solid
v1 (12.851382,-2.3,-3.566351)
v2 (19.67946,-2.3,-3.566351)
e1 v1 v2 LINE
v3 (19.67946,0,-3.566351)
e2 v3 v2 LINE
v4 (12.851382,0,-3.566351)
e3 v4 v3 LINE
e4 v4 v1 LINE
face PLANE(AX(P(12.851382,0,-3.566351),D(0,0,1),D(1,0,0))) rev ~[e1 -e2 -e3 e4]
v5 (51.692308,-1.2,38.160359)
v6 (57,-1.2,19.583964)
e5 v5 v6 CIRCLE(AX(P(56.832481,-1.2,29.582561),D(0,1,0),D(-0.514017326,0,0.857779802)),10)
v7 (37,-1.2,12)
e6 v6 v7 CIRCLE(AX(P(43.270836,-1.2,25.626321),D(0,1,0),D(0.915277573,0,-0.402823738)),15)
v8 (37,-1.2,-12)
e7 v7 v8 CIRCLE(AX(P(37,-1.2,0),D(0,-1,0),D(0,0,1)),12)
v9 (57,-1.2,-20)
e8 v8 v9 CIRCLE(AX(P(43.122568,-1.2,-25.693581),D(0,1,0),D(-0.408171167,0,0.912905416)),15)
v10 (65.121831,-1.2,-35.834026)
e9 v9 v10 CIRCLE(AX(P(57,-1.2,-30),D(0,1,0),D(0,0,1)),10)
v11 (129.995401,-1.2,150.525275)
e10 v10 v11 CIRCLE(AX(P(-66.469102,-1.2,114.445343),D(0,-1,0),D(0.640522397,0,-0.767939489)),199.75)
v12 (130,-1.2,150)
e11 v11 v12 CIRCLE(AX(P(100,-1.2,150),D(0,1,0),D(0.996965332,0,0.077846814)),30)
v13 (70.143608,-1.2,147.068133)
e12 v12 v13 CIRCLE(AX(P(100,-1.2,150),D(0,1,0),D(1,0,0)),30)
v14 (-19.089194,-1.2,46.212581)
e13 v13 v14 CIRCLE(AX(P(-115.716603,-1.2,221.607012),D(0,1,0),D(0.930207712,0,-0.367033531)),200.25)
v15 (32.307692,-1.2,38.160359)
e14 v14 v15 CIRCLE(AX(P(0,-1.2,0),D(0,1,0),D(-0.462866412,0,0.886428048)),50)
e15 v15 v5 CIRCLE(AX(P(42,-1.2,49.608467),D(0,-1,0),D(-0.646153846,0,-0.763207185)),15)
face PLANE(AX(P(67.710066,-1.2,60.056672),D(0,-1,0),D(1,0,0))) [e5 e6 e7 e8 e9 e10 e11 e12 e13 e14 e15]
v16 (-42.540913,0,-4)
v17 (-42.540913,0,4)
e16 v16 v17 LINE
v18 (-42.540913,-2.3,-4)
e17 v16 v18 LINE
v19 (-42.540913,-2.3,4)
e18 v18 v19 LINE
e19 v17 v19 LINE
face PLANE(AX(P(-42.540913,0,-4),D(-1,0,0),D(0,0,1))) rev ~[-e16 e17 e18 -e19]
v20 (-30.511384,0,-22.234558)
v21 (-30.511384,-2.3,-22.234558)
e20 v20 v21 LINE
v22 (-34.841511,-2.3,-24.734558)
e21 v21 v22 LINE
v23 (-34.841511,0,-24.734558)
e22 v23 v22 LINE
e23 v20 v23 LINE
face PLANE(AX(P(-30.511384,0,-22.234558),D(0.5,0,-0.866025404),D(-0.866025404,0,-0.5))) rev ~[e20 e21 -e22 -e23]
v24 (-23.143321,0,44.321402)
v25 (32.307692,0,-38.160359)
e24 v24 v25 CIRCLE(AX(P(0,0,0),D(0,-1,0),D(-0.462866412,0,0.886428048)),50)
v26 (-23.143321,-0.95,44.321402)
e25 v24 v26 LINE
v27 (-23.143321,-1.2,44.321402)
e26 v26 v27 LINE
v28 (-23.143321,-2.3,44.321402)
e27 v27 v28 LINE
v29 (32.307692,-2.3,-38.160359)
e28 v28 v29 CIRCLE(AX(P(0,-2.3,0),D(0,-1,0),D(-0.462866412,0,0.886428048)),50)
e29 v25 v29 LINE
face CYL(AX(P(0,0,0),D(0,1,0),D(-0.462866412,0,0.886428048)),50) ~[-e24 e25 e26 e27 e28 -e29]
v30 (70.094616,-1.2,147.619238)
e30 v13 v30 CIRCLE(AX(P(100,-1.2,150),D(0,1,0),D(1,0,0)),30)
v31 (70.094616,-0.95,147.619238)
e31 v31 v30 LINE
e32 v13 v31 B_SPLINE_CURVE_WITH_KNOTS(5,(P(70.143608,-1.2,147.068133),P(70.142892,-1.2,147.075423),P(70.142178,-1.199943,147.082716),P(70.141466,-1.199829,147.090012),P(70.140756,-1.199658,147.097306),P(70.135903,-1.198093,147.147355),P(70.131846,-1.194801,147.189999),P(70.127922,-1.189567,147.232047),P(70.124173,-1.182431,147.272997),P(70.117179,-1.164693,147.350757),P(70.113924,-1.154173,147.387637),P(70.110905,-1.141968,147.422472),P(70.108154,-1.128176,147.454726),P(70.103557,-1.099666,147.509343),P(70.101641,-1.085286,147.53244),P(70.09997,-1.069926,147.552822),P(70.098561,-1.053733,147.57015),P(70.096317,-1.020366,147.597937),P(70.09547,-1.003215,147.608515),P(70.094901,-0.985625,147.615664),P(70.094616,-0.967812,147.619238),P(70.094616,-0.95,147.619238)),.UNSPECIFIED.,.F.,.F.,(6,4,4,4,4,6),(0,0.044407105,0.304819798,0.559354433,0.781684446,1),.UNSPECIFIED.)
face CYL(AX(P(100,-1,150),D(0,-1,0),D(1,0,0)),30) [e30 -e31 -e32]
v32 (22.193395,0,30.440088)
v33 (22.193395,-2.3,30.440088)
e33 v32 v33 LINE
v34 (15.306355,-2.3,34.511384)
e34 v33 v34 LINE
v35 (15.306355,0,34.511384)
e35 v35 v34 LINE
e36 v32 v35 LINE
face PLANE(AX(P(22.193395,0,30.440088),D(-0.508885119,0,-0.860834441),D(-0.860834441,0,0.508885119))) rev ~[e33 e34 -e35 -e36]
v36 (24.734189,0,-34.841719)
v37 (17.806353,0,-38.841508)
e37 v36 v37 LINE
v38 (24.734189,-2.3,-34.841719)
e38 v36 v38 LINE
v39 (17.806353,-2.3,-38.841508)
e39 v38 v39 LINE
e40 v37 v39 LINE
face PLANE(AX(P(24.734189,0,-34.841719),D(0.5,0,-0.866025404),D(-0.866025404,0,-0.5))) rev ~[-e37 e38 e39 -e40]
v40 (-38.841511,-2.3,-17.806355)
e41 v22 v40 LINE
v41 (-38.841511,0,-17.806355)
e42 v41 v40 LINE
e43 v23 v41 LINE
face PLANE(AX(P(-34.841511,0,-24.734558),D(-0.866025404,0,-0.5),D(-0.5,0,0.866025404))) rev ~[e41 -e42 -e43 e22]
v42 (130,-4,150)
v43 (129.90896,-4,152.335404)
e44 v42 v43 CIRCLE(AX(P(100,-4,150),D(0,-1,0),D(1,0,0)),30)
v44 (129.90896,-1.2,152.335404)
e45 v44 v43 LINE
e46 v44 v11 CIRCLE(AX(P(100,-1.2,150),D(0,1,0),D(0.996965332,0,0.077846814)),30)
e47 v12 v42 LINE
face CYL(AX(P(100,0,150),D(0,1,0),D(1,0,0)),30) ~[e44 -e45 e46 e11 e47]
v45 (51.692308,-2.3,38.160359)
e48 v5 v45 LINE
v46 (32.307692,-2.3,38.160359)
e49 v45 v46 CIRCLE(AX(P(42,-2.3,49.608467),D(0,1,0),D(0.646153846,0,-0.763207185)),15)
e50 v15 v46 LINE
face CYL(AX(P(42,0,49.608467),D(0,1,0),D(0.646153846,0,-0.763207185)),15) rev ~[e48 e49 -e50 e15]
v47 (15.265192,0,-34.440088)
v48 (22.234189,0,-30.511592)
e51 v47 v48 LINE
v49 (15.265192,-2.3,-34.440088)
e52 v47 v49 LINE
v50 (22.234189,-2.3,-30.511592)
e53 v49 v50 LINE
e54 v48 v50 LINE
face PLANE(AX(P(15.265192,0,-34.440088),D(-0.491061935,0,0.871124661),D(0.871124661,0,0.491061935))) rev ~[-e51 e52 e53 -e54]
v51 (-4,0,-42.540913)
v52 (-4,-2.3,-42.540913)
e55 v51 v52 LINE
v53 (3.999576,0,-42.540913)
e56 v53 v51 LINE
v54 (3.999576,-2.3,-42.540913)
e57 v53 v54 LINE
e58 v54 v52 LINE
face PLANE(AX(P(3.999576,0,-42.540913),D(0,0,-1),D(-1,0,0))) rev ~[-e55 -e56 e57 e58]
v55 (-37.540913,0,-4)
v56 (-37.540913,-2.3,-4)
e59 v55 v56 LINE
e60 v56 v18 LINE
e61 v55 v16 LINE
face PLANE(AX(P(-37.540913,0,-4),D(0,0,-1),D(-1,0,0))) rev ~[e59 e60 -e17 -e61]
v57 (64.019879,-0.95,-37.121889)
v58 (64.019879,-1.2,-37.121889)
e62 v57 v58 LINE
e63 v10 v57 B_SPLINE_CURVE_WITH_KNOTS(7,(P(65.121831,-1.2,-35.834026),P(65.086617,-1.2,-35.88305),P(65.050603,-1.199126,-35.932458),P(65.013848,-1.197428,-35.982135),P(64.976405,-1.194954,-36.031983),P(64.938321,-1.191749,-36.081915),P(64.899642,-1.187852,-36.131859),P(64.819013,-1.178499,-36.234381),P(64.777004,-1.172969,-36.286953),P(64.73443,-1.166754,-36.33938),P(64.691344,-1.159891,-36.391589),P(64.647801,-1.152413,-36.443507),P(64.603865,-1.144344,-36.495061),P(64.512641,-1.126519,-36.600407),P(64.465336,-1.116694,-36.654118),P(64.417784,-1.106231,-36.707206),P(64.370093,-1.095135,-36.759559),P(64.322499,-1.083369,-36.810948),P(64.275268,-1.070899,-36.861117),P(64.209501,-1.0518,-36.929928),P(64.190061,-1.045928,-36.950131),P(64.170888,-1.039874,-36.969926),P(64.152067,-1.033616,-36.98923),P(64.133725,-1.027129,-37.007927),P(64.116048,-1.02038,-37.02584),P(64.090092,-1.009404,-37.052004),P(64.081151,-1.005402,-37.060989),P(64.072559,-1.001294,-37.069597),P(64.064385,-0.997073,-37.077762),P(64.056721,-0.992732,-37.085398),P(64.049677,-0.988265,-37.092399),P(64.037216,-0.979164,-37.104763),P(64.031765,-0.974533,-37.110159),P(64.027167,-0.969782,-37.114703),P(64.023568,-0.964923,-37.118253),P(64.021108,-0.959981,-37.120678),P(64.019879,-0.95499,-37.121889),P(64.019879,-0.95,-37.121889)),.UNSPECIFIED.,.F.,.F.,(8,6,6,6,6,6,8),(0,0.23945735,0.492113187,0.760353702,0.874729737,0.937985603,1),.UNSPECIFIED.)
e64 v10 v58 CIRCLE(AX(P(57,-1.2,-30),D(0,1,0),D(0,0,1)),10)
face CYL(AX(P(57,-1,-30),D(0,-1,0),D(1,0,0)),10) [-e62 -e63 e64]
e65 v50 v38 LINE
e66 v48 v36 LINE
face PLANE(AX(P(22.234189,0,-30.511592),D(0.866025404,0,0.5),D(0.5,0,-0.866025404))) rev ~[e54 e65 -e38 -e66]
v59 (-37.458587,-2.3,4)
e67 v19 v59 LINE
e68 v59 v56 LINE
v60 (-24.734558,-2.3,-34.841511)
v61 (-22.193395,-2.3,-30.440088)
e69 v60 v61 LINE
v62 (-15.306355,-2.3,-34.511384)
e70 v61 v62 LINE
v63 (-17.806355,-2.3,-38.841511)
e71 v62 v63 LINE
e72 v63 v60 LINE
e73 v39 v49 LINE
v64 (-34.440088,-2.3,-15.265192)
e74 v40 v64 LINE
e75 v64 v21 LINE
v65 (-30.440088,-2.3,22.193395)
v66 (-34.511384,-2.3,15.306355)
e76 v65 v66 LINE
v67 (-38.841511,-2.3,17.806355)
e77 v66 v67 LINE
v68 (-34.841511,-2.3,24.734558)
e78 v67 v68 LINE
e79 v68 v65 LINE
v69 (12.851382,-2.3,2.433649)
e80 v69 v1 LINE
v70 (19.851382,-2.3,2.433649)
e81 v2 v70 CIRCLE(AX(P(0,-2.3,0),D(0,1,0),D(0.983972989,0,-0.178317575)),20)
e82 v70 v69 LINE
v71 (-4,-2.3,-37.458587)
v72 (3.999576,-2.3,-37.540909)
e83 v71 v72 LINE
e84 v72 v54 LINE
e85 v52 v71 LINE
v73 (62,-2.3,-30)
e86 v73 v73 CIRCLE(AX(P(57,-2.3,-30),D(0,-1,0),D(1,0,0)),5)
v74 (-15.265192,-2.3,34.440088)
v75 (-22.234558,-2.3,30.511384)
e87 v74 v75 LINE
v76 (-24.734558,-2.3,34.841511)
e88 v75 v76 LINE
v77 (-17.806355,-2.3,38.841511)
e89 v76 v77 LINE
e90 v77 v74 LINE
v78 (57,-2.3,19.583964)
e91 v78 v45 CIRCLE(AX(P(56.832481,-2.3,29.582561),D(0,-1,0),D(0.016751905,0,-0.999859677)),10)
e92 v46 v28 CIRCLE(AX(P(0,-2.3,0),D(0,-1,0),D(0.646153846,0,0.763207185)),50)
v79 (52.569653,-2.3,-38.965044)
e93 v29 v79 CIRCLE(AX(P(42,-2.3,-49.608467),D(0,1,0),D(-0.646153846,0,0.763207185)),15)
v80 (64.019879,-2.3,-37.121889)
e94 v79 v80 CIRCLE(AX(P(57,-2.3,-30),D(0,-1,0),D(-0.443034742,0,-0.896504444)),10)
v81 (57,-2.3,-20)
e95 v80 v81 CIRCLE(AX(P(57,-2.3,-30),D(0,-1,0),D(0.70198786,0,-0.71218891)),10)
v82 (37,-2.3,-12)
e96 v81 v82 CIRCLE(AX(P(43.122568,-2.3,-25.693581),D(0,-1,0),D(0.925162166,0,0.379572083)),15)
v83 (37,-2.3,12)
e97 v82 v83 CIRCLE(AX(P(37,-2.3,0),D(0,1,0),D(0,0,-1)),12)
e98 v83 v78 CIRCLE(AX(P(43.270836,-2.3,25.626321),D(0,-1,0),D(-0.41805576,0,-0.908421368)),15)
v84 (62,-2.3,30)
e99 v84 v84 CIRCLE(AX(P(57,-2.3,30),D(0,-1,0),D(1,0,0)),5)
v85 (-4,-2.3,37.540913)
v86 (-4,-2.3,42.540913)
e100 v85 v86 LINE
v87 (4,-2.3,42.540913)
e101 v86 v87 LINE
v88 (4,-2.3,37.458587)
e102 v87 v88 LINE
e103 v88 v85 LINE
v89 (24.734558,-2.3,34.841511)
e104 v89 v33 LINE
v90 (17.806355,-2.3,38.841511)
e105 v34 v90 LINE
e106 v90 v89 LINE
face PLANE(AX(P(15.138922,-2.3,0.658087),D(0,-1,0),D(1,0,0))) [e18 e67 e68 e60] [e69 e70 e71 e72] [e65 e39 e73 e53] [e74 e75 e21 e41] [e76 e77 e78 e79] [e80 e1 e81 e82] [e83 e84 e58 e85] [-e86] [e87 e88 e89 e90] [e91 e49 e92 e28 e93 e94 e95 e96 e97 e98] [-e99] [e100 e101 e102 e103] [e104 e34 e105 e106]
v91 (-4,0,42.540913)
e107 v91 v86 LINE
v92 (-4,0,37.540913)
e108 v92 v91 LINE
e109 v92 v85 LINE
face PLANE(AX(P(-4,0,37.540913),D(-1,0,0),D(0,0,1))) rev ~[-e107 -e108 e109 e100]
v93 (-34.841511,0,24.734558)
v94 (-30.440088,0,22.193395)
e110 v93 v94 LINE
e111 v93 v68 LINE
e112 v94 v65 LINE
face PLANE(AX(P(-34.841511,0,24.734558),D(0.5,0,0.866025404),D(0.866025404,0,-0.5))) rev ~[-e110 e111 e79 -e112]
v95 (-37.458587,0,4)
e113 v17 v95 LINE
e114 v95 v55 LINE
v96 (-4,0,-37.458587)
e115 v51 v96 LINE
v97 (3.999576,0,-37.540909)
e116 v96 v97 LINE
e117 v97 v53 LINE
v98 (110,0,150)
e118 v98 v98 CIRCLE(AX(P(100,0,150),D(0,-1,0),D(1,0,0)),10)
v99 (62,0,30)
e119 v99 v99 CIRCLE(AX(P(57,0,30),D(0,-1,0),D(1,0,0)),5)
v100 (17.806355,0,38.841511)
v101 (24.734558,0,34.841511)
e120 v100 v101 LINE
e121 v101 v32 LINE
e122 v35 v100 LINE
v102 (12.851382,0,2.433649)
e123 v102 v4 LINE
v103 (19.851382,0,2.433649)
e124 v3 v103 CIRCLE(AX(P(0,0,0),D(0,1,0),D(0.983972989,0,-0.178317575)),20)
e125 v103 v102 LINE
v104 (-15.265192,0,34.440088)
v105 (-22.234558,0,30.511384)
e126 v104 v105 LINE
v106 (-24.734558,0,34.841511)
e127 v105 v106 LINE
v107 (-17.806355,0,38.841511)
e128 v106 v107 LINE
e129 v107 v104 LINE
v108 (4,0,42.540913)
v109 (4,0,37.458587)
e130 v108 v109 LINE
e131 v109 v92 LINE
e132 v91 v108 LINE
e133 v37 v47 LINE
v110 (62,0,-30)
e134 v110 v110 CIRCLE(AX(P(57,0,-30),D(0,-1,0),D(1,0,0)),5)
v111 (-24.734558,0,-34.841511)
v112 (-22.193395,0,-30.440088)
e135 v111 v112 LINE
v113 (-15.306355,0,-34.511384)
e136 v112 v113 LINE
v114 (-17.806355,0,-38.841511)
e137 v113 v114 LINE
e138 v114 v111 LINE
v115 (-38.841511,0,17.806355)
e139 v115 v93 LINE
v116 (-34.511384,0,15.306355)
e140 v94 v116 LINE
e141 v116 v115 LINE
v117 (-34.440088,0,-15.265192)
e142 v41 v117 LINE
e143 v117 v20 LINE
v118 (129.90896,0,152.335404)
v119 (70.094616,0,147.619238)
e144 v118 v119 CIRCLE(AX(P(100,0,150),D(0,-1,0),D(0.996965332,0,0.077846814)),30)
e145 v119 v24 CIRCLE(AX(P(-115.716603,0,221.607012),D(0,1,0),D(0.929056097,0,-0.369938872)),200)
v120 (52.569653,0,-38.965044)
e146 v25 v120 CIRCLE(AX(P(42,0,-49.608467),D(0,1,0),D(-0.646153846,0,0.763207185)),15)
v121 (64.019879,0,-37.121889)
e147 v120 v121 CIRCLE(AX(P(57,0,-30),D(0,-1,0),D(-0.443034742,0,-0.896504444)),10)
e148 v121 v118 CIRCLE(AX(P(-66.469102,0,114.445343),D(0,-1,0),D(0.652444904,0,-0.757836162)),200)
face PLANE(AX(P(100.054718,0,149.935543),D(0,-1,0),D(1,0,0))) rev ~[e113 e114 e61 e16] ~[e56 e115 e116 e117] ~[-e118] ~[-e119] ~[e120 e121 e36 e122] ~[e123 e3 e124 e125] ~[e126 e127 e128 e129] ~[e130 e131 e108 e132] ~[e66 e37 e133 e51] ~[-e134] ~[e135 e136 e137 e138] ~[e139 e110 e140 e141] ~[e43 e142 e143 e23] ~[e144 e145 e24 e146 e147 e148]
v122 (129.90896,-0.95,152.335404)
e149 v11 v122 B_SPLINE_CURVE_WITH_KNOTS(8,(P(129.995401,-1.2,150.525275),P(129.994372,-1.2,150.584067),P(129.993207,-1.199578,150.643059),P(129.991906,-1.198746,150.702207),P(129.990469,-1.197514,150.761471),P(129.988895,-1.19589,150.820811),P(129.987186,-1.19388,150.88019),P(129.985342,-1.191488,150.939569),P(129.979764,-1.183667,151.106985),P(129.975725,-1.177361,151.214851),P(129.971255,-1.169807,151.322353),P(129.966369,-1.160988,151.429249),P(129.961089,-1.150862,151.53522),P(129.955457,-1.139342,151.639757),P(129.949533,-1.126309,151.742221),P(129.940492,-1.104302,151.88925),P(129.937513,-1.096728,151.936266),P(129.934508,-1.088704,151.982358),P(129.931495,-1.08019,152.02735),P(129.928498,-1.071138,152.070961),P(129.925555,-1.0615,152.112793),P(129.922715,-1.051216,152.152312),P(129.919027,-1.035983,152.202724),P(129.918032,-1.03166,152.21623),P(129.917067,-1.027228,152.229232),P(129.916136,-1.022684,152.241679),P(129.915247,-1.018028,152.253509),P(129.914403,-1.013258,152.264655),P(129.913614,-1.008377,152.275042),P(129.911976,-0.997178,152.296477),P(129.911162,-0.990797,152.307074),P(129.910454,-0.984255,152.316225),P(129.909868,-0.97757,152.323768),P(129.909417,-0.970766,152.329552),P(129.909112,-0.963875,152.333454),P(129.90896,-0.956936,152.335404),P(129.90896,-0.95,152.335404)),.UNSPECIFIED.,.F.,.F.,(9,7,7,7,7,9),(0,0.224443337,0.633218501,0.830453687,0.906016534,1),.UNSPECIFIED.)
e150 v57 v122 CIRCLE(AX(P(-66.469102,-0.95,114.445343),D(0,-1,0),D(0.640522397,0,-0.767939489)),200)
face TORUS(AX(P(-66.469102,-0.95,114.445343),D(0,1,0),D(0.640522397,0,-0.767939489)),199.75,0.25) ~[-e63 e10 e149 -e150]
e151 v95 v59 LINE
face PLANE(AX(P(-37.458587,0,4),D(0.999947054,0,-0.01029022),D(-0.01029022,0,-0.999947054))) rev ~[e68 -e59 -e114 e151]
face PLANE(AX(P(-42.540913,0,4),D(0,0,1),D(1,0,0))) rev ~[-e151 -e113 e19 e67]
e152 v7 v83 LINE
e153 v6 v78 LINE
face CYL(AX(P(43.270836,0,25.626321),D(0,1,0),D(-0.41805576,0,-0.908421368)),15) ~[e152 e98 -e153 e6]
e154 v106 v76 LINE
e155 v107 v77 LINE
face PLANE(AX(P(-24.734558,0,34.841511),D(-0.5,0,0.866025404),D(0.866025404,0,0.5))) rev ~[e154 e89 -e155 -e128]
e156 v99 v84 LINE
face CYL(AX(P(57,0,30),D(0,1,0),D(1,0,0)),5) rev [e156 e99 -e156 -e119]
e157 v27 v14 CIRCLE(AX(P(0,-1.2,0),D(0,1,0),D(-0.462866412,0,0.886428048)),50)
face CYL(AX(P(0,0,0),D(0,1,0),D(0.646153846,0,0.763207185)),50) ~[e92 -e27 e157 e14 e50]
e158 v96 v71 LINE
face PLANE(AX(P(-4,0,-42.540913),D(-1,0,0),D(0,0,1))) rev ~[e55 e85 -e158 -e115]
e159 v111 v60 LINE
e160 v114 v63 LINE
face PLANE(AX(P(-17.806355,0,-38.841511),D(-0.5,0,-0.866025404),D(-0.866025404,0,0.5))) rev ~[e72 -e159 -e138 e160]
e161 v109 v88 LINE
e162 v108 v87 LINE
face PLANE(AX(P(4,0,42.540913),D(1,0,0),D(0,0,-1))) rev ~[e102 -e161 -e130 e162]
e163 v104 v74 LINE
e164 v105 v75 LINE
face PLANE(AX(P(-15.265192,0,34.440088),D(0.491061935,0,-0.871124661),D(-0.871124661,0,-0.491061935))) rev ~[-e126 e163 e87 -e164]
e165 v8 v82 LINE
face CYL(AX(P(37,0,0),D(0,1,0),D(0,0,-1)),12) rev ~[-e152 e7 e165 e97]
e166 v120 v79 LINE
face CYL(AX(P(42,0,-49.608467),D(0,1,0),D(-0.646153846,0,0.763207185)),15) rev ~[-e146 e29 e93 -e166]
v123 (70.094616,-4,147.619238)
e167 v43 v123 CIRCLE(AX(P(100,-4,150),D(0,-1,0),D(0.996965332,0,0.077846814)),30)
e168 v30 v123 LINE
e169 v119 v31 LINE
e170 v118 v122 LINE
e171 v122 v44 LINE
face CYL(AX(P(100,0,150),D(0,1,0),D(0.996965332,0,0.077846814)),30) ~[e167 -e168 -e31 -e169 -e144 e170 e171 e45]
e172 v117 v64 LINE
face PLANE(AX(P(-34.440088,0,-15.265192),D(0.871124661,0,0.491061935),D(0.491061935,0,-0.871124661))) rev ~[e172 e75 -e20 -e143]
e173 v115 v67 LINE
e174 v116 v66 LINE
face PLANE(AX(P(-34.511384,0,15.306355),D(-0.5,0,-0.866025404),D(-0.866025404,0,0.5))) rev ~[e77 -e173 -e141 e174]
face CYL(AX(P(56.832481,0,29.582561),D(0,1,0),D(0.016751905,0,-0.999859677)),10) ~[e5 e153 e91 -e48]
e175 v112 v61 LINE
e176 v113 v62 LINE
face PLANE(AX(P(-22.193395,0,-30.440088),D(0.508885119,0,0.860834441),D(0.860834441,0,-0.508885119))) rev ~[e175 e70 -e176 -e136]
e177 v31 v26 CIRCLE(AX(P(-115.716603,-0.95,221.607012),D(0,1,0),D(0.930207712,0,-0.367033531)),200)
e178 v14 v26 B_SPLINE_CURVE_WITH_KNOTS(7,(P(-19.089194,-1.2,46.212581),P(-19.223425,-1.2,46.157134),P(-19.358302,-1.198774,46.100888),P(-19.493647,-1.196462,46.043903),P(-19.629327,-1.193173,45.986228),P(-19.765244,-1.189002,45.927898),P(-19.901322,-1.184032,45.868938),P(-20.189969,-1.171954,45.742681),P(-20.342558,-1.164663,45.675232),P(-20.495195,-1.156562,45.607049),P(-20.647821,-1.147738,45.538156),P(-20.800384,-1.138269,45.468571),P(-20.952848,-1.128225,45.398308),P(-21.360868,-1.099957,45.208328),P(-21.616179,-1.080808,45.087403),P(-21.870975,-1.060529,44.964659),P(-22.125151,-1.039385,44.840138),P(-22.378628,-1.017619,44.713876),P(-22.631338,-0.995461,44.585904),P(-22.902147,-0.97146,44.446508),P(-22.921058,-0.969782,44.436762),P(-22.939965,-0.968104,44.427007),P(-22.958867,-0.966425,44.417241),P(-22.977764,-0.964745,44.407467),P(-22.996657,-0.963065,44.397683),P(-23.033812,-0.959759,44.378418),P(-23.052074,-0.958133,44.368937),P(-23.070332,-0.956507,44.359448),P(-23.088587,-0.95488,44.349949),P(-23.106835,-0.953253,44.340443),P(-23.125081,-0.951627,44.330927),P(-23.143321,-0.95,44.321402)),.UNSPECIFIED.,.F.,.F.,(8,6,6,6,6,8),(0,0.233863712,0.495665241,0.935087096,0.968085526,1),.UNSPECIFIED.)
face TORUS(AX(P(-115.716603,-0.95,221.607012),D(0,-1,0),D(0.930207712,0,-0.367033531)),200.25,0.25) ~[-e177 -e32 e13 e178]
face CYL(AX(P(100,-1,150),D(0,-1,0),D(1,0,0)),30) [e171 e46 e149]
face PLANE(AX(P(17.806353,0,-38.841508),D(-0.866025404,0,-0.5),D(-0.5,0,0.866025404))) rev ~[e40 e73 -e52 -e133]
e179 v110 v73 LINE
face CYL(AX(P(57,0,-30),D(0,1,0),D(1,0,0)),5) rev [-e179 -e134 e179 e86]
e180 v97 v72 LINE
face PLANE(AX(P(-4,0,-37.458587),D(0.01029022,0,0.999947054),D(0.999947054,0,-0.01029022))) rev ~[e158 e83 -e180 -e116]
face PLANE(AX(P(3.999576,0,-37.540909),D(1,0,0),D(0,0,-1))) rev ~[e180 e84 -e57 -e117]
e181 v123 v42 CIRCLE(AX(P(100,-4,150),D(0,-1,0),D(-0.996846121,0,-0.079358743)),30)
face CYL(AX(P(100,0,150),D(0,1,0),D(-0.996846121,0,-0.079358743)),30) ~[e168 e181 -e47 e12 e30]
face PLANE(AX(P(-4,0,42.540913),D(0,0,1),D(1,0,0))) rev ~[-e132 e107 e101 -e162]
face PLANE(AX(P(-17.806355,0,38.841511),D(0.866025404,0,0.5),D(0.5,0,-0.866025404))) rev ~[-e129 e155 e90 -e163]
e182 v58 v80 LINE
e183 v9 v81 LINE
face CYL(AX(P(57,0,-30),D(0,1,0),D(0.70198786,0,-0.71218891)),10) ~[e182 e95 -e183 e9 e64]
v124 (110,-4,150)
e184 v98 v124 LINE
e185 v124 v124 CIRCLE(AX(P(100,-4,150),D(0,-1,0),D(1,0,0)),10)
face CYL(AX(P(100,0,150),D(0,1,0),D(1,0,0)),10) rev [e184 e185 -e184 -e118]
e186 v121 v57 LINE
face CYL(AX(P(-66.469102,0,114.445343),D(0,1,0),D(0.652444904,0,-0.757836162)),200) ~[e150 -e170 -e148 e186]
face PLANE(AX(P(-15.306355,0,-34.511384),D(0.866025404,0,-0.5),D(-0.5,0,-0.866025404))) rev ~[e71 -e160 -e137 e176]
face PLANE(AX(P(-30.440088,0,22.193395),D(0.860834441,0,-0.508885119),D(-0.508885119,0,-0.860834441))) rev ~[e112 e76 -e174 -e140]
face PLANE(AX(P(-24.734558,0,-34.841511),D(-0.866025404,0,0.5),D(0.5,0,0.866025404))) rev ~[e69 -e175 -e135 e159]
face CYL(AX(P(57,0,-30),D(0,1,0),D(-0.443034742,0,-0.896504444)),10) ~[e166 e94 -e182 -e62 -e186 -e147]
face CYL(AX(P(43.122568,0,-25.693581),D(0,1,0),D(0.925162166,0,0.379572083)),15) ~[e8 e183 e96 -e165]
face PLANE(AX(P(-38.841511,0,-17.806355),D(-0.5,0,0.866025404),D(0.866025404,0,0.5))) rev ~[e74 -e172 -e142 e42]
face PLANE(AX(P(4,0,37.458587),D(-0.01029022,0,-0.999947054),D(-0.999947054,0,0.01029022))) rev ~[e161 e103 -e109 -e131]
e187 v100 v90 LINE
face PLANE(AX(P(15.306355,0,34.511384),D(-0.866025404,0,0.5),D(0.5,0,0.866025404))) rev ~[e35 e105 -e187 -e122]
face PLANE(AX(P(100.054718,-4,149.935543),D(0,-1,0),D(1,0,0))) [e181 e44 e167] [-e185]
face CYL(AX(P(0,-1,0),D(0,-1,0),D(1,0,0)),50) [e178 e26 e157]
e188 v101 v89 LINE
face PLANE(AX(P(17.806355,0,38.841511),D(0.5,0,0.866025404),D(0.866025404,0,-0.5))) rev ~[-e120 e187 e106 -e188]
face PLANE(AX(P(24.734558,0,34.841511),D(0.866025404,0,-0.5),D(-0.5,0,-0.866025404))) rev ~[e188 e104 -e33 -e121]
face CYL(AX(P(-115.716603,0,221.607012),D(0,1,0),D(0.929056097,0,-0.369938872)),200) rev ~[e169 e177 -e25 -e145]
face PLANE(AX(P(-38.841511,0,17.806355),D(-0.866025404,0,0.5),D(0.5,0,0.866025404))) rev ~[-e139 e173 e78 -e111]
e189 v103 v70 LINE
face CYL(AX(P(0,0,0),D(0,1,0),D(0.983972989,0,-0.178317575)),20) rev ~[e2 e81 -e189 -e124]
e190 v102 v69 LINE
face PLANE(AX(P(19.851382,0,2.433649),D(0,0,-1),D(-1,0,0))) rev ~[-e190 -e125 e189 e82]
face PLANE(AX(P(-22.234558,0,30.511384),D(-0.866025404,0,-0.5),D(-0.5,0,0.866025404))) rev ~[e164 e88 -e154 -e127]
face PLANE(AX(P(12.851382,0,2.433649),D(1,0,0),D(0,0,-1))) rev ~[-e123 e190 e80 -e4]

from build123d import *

# Parameters (mm, degrees)
F0_R        = 5
F1_DEPTH    = 2.3
F2_DEPTH    = 1.2
F0_R_2      = 10
F3_DEPTH    = 4
F4_T4_ANGLE = 61.2690035525
F4_S5_R     = 30
F4_T6_DEPTH = 114
F4_S7_R     = 10
F4_T8_DEPTH = 114
F5_T4_ANGLE = 41.074053593
F5_S5_R     = 30
F5_T6_DEPTH = 82
F5_S7_R     = 50
F5_T8_DEPTH = 82


# Not quite as in the source:
# - a fillet or chamfer that OpenCascade refuses, or shapes differently, is made with other operations: its cross-section is extruded or revolved along the edge and cut away or added


with BuildPart() as f1:
    # F0 (on Front) → F1 (new body)
    with BuildSketch(Plane.XZ):
        with BuildLine():
            ThreePointArc((51.6923076923, 38.1603592456), (42, 34.6084670192), (32.3076923077, 38.1603592456))
            ThreePointArc((32.3076923077, 38.1603592456), (5.5214165196, 49.6942044872), (-23.1433206058, 44.3214024072))
            ThreePointArc((-23.1433206058, 44.3214024072), (-41.4946584334, -27.8961166023), (32.3076923077, -38.1603592456))
            ThreePointArc((32.3076923077, -38.1603592456), (42.5952420348, -34.6202821085), (52.5696525848, -38.9650444383))
            ThreePointArc((52.5696525848, -38.9650444383), (58.5892524469, -39.8729061912), (64.0198786028, -37.1218891035))
            ThreePointArc((64.0198786028, -37.1218891035), (66.2525372476, -26.2065115681), (57, -20))
            ThreePointArc((57, -20), (48.6934276496, -11.7664308759), (37, -12))
            ThreePointArc((37, -12), (25, 0), (37, 12))
            ThreePointArc((37, 12), (48.5892751146, 11.6008362262), (57, 19.5839644541))
            ThreePointArc((57, 19.5839644541), (66.4476997873, 32.3298447331), (51.6923076923, 38.1603592456))
        make_face()
        Polygon((-15.306354845, -34.5113842702), (-17.806354845, -38.8415112891), (-24.7345580753, -34.8415112891), (-22.1933950155, -30.4400877594), align=None, mode=Mode.SUBTRACT)
        Polygon((-30.5113842702, -22.2345580753), (-34.8415112891, -24.7345580753), (-38.8415112891, -17.806354845), (-34.4400877594, -15.2651917853), align=None, mode=Mode.SUBTRACT)
        Polygon((-37.5409129203, -4), (-42.5409129203, -4), (-42.5409129203, 4), (-37.4585868008, 4), align=None, mode=Mode.SUBTRACT)
        Polygon((3.9995764343, -37.5409085614), (3.9995764343, -42.5409129203), (-4, -42.5409129203), (-4, -37.4585868008), align=None, mode=Mode.SUBTRACT)
        Polygon((22.2341890772, -30.5115922782), (24.7341890772, -34.8417192971), (17.8063526656, -38.8415075143), (15.2651917853, -34.4400877594), align=None, mode=Mode.SUBTRACT)
        with BuildLine():
            Line((19.8513816884, 2.433648508), (12.8513816884, 2.433648508))
            Line((12.8513816884, 2.433648508), (12.8513816884, -3.566351492))
            Line((12.8513816884, -3.566351492), (19.679459775, -3.566351492))
            ThreePointArc((19.679459775, -3.566351492), (-19.9917947344, 0.572837934), (19.8513816884, 2.433648508))
        make_face(mode=Mode.SUBTRACT)
        Polygon((-34.5113842702, 15.306354845), (-38.8415112891, 17.806354845), (-34.8415112891, 24.7345580753), (-30.4400877594, 22.1933950155), align=None, mode=Mode.SUBTRACT)
        Polygon((-22.2345580753, 30.5113842702), (-24.7345580753, 34.8415112891), (-17.806354845, 38.8415112891), (-15.2651917853, 34.4400877594), align=None, mode=Mode.SUBTRACT)
        Polygon((15.306354845, 34.5113842702), (17.806354845, 38.8415112891), (24.7345580753, 34.8415112891), (22.1933950155, 30.4400877594), align=None, mode=Mode.SUBTRACT)
        Polygon((-4, 37.5409129203), (-4, 42.5409129203), (4, 42.5409129203), (4, 37.4585868008), align=None, mode=Mode.SUBTRACT)
        with Locations((57, -30)):
            Circle(F0_R, mode=Mode.SUBTRACT)
        with Locations((57, 30)):
            Circle(F0_R, mode=Mode.SUBTRACT)
    extrude(amount=F1_DEPTH)

    # F0 (on Front) → F2 (join)
    with BuildSketch(Plane.XZ):
        with BuildLine():
            ThreePointArc((-23.1433206058, 44.3214024072), (5.5214165196, 49.6942044872), (32.3076923077, 38.1603592456))
            ThreePointArc((32.3076923077, 38.1603592456), (42, 34.6084670192), (51.6923076923, 38.1603592456))
            ThreePointArc((51.6923076923, 38.1603592456), (66.4476997873, 32.3298447331), (57, 19.5839644541))
            ThreePointArc((57, 19.5839644541), (48.5892751146, 11.6008362262), (37, 12))
            ThreePointArc((37, 12), (25, 0), (37, -12))
            ThreePointArc((37, -12), (48.6934276496, -11.7664308759), (57, -20))
            ThreePointArc((57, -20), (66.2525372476, -26.2065115681), (64.0198786028, -37.1218891035))
            ThreePointArc((64.0198786028, -37.1218891035), (122.4330747785, 48.7493192224), (129.9089599648, 152.3354044245))
            ThreePointArc((129.9089599648, 152.3354044245), (129.977231351, 151.1685891188), (130, 150))
            ThreePointArc((130, 150), (101.1913208393, 120.0236634217), (70.0946163561, 147.6192377033))
            ThreePointArc((70.0946163561, 147.6192377033), (32.7491957463, 87.5998980678), (-23.1433206058, 44.3214024072))
        make_face()
    extrude(amount=F2_DEPTH)

    # F0 (on Front) → F3 (join)
    with BuildSketch(Plane.XZ):
        with BuildLine():
            ThreePointArc((129.9089599648, 152.3354044245), (97.6419159614, 179.9071804032), (70.0946163561, 147.6192377033))
            ThreePointArc((70.0946163561, 147.6192377033), (101.1913208393, 120.0236634217), (130, 150))
            ThreePointArc((130, 150), (129.977231351, 151.1685891188), (129.9089599648, 152.3354044245))
        make_face()
        with Locations((100, 150)):
            Circle(F0_R_2, mode=Mode.SUBTRACT)
    extrude(amount=F3_DEPTH)

    # F4: fillet of radius 0.25 on 1 edges, made by hand


with BuildPart() as f4_tool2:
    # F4_s3 → F4_t4 (revolve)
    with BuildSketch(Plane(origin=(17.0947609574, 0, 14.2583854823), x_dir=(0, 1, 0), z_dir=(-0.7679394892, 0, -0.6405223969))):
        with BuildLine():
            ThreePointArc((-1.2, 69.2879529885), (-1.1267766953, 69.4647296838), (-0.95, 69.5379529885))
            Line((-0.95, 69.5379529885), (-1.2, 69.5379529885))
            Line((-1.2, 69.5379529885), (-1.2, 69.2879529885))
        make_face()
    revolve(axis=Axis((-66.469102104, -1.2, 114.4453432197), (0, -1, 0)), revolution_arc=F4_T4_ANGLE)

    # F4_s5 → F4_t6 (cut, symmetric)
    with BuildSketch(Plane.XZ.offset(1)):
        with Locations((100, 150)):
            Circle(F4_S5_R)
    extrude(amount=F4_T6_DEPTH, both=True, mode=Mode.SUBTRACT)

    # F4_s7 → F4_t8 (cut, symmetric)
    with BuildSketch(Plane.XZ.offset(1)):
        with Locations((57, -30)):
            Circle(F4_S7_R)
    extrude(amount=F4_T8_DEPTH, both=True, mode=Mode.SUBTRACT)


with BuildPart() as f1_1:
    add(f1.part)

    # F4_t1: cut F4_tool2
    add(f4_tool2.part, mode=Mode.SUBTRACT)

    # F5: fillet of radius 0.25 on 1 edges, made by hand


with BuildPart() as f5_tool2:
    # F5_s3 → F5_t4 (revolve)
    with BuildSketch(Plane(origin=(60.0718928504, 0, 152.245866678), x_dir=(0, 1, 0), z_dir=(0.3670335308, 0, 0.9302077119))):
        with BuildLine():
            ThreePointArc((-1.2, -11.2723193897), (-1.1267766953, -11.0955426945), (-0.95, -11.0223193897))
            Line((-0.95, -11.0223193897), (-1.2, -11.0223193897))
            Line((-1.2, -11.0223193897), (-1.2, -11.2723193897))
        make_face()
    revolve(axis=Axis((-115.7166030288, -1.2, 221.6070120359), (0, 1, 0)), revolution_arc=F5_T4_ANGLE)

    # F5_s5 → F5_t6 (cut, symmetric)
    with BuildSketch(Plane.XZ.offset(1)):
        with Locations((100, 150)):
            Circle(F5_S5_R)
    extrude(amount=F5_T6_DEPTH, both=True, mode=Mode.SUBTRACT)

    # F5_s7 → F5_t8 (cut, symmetric)
    with BuildSketch(Plane.XZ.offset(1)):
        Circle(F5_S7_R)
    extrude(amount=F5_T8_DEPTH, both=True, mode=Mode.SUBTRACT)


with BuildPart() as f1_2:
    add(f1_1.part)

    # F5_t1: cut F5_tool2
    add(f5_tool2.part, mode=Mode.SUBTRACT)


solid = f1_2.part
